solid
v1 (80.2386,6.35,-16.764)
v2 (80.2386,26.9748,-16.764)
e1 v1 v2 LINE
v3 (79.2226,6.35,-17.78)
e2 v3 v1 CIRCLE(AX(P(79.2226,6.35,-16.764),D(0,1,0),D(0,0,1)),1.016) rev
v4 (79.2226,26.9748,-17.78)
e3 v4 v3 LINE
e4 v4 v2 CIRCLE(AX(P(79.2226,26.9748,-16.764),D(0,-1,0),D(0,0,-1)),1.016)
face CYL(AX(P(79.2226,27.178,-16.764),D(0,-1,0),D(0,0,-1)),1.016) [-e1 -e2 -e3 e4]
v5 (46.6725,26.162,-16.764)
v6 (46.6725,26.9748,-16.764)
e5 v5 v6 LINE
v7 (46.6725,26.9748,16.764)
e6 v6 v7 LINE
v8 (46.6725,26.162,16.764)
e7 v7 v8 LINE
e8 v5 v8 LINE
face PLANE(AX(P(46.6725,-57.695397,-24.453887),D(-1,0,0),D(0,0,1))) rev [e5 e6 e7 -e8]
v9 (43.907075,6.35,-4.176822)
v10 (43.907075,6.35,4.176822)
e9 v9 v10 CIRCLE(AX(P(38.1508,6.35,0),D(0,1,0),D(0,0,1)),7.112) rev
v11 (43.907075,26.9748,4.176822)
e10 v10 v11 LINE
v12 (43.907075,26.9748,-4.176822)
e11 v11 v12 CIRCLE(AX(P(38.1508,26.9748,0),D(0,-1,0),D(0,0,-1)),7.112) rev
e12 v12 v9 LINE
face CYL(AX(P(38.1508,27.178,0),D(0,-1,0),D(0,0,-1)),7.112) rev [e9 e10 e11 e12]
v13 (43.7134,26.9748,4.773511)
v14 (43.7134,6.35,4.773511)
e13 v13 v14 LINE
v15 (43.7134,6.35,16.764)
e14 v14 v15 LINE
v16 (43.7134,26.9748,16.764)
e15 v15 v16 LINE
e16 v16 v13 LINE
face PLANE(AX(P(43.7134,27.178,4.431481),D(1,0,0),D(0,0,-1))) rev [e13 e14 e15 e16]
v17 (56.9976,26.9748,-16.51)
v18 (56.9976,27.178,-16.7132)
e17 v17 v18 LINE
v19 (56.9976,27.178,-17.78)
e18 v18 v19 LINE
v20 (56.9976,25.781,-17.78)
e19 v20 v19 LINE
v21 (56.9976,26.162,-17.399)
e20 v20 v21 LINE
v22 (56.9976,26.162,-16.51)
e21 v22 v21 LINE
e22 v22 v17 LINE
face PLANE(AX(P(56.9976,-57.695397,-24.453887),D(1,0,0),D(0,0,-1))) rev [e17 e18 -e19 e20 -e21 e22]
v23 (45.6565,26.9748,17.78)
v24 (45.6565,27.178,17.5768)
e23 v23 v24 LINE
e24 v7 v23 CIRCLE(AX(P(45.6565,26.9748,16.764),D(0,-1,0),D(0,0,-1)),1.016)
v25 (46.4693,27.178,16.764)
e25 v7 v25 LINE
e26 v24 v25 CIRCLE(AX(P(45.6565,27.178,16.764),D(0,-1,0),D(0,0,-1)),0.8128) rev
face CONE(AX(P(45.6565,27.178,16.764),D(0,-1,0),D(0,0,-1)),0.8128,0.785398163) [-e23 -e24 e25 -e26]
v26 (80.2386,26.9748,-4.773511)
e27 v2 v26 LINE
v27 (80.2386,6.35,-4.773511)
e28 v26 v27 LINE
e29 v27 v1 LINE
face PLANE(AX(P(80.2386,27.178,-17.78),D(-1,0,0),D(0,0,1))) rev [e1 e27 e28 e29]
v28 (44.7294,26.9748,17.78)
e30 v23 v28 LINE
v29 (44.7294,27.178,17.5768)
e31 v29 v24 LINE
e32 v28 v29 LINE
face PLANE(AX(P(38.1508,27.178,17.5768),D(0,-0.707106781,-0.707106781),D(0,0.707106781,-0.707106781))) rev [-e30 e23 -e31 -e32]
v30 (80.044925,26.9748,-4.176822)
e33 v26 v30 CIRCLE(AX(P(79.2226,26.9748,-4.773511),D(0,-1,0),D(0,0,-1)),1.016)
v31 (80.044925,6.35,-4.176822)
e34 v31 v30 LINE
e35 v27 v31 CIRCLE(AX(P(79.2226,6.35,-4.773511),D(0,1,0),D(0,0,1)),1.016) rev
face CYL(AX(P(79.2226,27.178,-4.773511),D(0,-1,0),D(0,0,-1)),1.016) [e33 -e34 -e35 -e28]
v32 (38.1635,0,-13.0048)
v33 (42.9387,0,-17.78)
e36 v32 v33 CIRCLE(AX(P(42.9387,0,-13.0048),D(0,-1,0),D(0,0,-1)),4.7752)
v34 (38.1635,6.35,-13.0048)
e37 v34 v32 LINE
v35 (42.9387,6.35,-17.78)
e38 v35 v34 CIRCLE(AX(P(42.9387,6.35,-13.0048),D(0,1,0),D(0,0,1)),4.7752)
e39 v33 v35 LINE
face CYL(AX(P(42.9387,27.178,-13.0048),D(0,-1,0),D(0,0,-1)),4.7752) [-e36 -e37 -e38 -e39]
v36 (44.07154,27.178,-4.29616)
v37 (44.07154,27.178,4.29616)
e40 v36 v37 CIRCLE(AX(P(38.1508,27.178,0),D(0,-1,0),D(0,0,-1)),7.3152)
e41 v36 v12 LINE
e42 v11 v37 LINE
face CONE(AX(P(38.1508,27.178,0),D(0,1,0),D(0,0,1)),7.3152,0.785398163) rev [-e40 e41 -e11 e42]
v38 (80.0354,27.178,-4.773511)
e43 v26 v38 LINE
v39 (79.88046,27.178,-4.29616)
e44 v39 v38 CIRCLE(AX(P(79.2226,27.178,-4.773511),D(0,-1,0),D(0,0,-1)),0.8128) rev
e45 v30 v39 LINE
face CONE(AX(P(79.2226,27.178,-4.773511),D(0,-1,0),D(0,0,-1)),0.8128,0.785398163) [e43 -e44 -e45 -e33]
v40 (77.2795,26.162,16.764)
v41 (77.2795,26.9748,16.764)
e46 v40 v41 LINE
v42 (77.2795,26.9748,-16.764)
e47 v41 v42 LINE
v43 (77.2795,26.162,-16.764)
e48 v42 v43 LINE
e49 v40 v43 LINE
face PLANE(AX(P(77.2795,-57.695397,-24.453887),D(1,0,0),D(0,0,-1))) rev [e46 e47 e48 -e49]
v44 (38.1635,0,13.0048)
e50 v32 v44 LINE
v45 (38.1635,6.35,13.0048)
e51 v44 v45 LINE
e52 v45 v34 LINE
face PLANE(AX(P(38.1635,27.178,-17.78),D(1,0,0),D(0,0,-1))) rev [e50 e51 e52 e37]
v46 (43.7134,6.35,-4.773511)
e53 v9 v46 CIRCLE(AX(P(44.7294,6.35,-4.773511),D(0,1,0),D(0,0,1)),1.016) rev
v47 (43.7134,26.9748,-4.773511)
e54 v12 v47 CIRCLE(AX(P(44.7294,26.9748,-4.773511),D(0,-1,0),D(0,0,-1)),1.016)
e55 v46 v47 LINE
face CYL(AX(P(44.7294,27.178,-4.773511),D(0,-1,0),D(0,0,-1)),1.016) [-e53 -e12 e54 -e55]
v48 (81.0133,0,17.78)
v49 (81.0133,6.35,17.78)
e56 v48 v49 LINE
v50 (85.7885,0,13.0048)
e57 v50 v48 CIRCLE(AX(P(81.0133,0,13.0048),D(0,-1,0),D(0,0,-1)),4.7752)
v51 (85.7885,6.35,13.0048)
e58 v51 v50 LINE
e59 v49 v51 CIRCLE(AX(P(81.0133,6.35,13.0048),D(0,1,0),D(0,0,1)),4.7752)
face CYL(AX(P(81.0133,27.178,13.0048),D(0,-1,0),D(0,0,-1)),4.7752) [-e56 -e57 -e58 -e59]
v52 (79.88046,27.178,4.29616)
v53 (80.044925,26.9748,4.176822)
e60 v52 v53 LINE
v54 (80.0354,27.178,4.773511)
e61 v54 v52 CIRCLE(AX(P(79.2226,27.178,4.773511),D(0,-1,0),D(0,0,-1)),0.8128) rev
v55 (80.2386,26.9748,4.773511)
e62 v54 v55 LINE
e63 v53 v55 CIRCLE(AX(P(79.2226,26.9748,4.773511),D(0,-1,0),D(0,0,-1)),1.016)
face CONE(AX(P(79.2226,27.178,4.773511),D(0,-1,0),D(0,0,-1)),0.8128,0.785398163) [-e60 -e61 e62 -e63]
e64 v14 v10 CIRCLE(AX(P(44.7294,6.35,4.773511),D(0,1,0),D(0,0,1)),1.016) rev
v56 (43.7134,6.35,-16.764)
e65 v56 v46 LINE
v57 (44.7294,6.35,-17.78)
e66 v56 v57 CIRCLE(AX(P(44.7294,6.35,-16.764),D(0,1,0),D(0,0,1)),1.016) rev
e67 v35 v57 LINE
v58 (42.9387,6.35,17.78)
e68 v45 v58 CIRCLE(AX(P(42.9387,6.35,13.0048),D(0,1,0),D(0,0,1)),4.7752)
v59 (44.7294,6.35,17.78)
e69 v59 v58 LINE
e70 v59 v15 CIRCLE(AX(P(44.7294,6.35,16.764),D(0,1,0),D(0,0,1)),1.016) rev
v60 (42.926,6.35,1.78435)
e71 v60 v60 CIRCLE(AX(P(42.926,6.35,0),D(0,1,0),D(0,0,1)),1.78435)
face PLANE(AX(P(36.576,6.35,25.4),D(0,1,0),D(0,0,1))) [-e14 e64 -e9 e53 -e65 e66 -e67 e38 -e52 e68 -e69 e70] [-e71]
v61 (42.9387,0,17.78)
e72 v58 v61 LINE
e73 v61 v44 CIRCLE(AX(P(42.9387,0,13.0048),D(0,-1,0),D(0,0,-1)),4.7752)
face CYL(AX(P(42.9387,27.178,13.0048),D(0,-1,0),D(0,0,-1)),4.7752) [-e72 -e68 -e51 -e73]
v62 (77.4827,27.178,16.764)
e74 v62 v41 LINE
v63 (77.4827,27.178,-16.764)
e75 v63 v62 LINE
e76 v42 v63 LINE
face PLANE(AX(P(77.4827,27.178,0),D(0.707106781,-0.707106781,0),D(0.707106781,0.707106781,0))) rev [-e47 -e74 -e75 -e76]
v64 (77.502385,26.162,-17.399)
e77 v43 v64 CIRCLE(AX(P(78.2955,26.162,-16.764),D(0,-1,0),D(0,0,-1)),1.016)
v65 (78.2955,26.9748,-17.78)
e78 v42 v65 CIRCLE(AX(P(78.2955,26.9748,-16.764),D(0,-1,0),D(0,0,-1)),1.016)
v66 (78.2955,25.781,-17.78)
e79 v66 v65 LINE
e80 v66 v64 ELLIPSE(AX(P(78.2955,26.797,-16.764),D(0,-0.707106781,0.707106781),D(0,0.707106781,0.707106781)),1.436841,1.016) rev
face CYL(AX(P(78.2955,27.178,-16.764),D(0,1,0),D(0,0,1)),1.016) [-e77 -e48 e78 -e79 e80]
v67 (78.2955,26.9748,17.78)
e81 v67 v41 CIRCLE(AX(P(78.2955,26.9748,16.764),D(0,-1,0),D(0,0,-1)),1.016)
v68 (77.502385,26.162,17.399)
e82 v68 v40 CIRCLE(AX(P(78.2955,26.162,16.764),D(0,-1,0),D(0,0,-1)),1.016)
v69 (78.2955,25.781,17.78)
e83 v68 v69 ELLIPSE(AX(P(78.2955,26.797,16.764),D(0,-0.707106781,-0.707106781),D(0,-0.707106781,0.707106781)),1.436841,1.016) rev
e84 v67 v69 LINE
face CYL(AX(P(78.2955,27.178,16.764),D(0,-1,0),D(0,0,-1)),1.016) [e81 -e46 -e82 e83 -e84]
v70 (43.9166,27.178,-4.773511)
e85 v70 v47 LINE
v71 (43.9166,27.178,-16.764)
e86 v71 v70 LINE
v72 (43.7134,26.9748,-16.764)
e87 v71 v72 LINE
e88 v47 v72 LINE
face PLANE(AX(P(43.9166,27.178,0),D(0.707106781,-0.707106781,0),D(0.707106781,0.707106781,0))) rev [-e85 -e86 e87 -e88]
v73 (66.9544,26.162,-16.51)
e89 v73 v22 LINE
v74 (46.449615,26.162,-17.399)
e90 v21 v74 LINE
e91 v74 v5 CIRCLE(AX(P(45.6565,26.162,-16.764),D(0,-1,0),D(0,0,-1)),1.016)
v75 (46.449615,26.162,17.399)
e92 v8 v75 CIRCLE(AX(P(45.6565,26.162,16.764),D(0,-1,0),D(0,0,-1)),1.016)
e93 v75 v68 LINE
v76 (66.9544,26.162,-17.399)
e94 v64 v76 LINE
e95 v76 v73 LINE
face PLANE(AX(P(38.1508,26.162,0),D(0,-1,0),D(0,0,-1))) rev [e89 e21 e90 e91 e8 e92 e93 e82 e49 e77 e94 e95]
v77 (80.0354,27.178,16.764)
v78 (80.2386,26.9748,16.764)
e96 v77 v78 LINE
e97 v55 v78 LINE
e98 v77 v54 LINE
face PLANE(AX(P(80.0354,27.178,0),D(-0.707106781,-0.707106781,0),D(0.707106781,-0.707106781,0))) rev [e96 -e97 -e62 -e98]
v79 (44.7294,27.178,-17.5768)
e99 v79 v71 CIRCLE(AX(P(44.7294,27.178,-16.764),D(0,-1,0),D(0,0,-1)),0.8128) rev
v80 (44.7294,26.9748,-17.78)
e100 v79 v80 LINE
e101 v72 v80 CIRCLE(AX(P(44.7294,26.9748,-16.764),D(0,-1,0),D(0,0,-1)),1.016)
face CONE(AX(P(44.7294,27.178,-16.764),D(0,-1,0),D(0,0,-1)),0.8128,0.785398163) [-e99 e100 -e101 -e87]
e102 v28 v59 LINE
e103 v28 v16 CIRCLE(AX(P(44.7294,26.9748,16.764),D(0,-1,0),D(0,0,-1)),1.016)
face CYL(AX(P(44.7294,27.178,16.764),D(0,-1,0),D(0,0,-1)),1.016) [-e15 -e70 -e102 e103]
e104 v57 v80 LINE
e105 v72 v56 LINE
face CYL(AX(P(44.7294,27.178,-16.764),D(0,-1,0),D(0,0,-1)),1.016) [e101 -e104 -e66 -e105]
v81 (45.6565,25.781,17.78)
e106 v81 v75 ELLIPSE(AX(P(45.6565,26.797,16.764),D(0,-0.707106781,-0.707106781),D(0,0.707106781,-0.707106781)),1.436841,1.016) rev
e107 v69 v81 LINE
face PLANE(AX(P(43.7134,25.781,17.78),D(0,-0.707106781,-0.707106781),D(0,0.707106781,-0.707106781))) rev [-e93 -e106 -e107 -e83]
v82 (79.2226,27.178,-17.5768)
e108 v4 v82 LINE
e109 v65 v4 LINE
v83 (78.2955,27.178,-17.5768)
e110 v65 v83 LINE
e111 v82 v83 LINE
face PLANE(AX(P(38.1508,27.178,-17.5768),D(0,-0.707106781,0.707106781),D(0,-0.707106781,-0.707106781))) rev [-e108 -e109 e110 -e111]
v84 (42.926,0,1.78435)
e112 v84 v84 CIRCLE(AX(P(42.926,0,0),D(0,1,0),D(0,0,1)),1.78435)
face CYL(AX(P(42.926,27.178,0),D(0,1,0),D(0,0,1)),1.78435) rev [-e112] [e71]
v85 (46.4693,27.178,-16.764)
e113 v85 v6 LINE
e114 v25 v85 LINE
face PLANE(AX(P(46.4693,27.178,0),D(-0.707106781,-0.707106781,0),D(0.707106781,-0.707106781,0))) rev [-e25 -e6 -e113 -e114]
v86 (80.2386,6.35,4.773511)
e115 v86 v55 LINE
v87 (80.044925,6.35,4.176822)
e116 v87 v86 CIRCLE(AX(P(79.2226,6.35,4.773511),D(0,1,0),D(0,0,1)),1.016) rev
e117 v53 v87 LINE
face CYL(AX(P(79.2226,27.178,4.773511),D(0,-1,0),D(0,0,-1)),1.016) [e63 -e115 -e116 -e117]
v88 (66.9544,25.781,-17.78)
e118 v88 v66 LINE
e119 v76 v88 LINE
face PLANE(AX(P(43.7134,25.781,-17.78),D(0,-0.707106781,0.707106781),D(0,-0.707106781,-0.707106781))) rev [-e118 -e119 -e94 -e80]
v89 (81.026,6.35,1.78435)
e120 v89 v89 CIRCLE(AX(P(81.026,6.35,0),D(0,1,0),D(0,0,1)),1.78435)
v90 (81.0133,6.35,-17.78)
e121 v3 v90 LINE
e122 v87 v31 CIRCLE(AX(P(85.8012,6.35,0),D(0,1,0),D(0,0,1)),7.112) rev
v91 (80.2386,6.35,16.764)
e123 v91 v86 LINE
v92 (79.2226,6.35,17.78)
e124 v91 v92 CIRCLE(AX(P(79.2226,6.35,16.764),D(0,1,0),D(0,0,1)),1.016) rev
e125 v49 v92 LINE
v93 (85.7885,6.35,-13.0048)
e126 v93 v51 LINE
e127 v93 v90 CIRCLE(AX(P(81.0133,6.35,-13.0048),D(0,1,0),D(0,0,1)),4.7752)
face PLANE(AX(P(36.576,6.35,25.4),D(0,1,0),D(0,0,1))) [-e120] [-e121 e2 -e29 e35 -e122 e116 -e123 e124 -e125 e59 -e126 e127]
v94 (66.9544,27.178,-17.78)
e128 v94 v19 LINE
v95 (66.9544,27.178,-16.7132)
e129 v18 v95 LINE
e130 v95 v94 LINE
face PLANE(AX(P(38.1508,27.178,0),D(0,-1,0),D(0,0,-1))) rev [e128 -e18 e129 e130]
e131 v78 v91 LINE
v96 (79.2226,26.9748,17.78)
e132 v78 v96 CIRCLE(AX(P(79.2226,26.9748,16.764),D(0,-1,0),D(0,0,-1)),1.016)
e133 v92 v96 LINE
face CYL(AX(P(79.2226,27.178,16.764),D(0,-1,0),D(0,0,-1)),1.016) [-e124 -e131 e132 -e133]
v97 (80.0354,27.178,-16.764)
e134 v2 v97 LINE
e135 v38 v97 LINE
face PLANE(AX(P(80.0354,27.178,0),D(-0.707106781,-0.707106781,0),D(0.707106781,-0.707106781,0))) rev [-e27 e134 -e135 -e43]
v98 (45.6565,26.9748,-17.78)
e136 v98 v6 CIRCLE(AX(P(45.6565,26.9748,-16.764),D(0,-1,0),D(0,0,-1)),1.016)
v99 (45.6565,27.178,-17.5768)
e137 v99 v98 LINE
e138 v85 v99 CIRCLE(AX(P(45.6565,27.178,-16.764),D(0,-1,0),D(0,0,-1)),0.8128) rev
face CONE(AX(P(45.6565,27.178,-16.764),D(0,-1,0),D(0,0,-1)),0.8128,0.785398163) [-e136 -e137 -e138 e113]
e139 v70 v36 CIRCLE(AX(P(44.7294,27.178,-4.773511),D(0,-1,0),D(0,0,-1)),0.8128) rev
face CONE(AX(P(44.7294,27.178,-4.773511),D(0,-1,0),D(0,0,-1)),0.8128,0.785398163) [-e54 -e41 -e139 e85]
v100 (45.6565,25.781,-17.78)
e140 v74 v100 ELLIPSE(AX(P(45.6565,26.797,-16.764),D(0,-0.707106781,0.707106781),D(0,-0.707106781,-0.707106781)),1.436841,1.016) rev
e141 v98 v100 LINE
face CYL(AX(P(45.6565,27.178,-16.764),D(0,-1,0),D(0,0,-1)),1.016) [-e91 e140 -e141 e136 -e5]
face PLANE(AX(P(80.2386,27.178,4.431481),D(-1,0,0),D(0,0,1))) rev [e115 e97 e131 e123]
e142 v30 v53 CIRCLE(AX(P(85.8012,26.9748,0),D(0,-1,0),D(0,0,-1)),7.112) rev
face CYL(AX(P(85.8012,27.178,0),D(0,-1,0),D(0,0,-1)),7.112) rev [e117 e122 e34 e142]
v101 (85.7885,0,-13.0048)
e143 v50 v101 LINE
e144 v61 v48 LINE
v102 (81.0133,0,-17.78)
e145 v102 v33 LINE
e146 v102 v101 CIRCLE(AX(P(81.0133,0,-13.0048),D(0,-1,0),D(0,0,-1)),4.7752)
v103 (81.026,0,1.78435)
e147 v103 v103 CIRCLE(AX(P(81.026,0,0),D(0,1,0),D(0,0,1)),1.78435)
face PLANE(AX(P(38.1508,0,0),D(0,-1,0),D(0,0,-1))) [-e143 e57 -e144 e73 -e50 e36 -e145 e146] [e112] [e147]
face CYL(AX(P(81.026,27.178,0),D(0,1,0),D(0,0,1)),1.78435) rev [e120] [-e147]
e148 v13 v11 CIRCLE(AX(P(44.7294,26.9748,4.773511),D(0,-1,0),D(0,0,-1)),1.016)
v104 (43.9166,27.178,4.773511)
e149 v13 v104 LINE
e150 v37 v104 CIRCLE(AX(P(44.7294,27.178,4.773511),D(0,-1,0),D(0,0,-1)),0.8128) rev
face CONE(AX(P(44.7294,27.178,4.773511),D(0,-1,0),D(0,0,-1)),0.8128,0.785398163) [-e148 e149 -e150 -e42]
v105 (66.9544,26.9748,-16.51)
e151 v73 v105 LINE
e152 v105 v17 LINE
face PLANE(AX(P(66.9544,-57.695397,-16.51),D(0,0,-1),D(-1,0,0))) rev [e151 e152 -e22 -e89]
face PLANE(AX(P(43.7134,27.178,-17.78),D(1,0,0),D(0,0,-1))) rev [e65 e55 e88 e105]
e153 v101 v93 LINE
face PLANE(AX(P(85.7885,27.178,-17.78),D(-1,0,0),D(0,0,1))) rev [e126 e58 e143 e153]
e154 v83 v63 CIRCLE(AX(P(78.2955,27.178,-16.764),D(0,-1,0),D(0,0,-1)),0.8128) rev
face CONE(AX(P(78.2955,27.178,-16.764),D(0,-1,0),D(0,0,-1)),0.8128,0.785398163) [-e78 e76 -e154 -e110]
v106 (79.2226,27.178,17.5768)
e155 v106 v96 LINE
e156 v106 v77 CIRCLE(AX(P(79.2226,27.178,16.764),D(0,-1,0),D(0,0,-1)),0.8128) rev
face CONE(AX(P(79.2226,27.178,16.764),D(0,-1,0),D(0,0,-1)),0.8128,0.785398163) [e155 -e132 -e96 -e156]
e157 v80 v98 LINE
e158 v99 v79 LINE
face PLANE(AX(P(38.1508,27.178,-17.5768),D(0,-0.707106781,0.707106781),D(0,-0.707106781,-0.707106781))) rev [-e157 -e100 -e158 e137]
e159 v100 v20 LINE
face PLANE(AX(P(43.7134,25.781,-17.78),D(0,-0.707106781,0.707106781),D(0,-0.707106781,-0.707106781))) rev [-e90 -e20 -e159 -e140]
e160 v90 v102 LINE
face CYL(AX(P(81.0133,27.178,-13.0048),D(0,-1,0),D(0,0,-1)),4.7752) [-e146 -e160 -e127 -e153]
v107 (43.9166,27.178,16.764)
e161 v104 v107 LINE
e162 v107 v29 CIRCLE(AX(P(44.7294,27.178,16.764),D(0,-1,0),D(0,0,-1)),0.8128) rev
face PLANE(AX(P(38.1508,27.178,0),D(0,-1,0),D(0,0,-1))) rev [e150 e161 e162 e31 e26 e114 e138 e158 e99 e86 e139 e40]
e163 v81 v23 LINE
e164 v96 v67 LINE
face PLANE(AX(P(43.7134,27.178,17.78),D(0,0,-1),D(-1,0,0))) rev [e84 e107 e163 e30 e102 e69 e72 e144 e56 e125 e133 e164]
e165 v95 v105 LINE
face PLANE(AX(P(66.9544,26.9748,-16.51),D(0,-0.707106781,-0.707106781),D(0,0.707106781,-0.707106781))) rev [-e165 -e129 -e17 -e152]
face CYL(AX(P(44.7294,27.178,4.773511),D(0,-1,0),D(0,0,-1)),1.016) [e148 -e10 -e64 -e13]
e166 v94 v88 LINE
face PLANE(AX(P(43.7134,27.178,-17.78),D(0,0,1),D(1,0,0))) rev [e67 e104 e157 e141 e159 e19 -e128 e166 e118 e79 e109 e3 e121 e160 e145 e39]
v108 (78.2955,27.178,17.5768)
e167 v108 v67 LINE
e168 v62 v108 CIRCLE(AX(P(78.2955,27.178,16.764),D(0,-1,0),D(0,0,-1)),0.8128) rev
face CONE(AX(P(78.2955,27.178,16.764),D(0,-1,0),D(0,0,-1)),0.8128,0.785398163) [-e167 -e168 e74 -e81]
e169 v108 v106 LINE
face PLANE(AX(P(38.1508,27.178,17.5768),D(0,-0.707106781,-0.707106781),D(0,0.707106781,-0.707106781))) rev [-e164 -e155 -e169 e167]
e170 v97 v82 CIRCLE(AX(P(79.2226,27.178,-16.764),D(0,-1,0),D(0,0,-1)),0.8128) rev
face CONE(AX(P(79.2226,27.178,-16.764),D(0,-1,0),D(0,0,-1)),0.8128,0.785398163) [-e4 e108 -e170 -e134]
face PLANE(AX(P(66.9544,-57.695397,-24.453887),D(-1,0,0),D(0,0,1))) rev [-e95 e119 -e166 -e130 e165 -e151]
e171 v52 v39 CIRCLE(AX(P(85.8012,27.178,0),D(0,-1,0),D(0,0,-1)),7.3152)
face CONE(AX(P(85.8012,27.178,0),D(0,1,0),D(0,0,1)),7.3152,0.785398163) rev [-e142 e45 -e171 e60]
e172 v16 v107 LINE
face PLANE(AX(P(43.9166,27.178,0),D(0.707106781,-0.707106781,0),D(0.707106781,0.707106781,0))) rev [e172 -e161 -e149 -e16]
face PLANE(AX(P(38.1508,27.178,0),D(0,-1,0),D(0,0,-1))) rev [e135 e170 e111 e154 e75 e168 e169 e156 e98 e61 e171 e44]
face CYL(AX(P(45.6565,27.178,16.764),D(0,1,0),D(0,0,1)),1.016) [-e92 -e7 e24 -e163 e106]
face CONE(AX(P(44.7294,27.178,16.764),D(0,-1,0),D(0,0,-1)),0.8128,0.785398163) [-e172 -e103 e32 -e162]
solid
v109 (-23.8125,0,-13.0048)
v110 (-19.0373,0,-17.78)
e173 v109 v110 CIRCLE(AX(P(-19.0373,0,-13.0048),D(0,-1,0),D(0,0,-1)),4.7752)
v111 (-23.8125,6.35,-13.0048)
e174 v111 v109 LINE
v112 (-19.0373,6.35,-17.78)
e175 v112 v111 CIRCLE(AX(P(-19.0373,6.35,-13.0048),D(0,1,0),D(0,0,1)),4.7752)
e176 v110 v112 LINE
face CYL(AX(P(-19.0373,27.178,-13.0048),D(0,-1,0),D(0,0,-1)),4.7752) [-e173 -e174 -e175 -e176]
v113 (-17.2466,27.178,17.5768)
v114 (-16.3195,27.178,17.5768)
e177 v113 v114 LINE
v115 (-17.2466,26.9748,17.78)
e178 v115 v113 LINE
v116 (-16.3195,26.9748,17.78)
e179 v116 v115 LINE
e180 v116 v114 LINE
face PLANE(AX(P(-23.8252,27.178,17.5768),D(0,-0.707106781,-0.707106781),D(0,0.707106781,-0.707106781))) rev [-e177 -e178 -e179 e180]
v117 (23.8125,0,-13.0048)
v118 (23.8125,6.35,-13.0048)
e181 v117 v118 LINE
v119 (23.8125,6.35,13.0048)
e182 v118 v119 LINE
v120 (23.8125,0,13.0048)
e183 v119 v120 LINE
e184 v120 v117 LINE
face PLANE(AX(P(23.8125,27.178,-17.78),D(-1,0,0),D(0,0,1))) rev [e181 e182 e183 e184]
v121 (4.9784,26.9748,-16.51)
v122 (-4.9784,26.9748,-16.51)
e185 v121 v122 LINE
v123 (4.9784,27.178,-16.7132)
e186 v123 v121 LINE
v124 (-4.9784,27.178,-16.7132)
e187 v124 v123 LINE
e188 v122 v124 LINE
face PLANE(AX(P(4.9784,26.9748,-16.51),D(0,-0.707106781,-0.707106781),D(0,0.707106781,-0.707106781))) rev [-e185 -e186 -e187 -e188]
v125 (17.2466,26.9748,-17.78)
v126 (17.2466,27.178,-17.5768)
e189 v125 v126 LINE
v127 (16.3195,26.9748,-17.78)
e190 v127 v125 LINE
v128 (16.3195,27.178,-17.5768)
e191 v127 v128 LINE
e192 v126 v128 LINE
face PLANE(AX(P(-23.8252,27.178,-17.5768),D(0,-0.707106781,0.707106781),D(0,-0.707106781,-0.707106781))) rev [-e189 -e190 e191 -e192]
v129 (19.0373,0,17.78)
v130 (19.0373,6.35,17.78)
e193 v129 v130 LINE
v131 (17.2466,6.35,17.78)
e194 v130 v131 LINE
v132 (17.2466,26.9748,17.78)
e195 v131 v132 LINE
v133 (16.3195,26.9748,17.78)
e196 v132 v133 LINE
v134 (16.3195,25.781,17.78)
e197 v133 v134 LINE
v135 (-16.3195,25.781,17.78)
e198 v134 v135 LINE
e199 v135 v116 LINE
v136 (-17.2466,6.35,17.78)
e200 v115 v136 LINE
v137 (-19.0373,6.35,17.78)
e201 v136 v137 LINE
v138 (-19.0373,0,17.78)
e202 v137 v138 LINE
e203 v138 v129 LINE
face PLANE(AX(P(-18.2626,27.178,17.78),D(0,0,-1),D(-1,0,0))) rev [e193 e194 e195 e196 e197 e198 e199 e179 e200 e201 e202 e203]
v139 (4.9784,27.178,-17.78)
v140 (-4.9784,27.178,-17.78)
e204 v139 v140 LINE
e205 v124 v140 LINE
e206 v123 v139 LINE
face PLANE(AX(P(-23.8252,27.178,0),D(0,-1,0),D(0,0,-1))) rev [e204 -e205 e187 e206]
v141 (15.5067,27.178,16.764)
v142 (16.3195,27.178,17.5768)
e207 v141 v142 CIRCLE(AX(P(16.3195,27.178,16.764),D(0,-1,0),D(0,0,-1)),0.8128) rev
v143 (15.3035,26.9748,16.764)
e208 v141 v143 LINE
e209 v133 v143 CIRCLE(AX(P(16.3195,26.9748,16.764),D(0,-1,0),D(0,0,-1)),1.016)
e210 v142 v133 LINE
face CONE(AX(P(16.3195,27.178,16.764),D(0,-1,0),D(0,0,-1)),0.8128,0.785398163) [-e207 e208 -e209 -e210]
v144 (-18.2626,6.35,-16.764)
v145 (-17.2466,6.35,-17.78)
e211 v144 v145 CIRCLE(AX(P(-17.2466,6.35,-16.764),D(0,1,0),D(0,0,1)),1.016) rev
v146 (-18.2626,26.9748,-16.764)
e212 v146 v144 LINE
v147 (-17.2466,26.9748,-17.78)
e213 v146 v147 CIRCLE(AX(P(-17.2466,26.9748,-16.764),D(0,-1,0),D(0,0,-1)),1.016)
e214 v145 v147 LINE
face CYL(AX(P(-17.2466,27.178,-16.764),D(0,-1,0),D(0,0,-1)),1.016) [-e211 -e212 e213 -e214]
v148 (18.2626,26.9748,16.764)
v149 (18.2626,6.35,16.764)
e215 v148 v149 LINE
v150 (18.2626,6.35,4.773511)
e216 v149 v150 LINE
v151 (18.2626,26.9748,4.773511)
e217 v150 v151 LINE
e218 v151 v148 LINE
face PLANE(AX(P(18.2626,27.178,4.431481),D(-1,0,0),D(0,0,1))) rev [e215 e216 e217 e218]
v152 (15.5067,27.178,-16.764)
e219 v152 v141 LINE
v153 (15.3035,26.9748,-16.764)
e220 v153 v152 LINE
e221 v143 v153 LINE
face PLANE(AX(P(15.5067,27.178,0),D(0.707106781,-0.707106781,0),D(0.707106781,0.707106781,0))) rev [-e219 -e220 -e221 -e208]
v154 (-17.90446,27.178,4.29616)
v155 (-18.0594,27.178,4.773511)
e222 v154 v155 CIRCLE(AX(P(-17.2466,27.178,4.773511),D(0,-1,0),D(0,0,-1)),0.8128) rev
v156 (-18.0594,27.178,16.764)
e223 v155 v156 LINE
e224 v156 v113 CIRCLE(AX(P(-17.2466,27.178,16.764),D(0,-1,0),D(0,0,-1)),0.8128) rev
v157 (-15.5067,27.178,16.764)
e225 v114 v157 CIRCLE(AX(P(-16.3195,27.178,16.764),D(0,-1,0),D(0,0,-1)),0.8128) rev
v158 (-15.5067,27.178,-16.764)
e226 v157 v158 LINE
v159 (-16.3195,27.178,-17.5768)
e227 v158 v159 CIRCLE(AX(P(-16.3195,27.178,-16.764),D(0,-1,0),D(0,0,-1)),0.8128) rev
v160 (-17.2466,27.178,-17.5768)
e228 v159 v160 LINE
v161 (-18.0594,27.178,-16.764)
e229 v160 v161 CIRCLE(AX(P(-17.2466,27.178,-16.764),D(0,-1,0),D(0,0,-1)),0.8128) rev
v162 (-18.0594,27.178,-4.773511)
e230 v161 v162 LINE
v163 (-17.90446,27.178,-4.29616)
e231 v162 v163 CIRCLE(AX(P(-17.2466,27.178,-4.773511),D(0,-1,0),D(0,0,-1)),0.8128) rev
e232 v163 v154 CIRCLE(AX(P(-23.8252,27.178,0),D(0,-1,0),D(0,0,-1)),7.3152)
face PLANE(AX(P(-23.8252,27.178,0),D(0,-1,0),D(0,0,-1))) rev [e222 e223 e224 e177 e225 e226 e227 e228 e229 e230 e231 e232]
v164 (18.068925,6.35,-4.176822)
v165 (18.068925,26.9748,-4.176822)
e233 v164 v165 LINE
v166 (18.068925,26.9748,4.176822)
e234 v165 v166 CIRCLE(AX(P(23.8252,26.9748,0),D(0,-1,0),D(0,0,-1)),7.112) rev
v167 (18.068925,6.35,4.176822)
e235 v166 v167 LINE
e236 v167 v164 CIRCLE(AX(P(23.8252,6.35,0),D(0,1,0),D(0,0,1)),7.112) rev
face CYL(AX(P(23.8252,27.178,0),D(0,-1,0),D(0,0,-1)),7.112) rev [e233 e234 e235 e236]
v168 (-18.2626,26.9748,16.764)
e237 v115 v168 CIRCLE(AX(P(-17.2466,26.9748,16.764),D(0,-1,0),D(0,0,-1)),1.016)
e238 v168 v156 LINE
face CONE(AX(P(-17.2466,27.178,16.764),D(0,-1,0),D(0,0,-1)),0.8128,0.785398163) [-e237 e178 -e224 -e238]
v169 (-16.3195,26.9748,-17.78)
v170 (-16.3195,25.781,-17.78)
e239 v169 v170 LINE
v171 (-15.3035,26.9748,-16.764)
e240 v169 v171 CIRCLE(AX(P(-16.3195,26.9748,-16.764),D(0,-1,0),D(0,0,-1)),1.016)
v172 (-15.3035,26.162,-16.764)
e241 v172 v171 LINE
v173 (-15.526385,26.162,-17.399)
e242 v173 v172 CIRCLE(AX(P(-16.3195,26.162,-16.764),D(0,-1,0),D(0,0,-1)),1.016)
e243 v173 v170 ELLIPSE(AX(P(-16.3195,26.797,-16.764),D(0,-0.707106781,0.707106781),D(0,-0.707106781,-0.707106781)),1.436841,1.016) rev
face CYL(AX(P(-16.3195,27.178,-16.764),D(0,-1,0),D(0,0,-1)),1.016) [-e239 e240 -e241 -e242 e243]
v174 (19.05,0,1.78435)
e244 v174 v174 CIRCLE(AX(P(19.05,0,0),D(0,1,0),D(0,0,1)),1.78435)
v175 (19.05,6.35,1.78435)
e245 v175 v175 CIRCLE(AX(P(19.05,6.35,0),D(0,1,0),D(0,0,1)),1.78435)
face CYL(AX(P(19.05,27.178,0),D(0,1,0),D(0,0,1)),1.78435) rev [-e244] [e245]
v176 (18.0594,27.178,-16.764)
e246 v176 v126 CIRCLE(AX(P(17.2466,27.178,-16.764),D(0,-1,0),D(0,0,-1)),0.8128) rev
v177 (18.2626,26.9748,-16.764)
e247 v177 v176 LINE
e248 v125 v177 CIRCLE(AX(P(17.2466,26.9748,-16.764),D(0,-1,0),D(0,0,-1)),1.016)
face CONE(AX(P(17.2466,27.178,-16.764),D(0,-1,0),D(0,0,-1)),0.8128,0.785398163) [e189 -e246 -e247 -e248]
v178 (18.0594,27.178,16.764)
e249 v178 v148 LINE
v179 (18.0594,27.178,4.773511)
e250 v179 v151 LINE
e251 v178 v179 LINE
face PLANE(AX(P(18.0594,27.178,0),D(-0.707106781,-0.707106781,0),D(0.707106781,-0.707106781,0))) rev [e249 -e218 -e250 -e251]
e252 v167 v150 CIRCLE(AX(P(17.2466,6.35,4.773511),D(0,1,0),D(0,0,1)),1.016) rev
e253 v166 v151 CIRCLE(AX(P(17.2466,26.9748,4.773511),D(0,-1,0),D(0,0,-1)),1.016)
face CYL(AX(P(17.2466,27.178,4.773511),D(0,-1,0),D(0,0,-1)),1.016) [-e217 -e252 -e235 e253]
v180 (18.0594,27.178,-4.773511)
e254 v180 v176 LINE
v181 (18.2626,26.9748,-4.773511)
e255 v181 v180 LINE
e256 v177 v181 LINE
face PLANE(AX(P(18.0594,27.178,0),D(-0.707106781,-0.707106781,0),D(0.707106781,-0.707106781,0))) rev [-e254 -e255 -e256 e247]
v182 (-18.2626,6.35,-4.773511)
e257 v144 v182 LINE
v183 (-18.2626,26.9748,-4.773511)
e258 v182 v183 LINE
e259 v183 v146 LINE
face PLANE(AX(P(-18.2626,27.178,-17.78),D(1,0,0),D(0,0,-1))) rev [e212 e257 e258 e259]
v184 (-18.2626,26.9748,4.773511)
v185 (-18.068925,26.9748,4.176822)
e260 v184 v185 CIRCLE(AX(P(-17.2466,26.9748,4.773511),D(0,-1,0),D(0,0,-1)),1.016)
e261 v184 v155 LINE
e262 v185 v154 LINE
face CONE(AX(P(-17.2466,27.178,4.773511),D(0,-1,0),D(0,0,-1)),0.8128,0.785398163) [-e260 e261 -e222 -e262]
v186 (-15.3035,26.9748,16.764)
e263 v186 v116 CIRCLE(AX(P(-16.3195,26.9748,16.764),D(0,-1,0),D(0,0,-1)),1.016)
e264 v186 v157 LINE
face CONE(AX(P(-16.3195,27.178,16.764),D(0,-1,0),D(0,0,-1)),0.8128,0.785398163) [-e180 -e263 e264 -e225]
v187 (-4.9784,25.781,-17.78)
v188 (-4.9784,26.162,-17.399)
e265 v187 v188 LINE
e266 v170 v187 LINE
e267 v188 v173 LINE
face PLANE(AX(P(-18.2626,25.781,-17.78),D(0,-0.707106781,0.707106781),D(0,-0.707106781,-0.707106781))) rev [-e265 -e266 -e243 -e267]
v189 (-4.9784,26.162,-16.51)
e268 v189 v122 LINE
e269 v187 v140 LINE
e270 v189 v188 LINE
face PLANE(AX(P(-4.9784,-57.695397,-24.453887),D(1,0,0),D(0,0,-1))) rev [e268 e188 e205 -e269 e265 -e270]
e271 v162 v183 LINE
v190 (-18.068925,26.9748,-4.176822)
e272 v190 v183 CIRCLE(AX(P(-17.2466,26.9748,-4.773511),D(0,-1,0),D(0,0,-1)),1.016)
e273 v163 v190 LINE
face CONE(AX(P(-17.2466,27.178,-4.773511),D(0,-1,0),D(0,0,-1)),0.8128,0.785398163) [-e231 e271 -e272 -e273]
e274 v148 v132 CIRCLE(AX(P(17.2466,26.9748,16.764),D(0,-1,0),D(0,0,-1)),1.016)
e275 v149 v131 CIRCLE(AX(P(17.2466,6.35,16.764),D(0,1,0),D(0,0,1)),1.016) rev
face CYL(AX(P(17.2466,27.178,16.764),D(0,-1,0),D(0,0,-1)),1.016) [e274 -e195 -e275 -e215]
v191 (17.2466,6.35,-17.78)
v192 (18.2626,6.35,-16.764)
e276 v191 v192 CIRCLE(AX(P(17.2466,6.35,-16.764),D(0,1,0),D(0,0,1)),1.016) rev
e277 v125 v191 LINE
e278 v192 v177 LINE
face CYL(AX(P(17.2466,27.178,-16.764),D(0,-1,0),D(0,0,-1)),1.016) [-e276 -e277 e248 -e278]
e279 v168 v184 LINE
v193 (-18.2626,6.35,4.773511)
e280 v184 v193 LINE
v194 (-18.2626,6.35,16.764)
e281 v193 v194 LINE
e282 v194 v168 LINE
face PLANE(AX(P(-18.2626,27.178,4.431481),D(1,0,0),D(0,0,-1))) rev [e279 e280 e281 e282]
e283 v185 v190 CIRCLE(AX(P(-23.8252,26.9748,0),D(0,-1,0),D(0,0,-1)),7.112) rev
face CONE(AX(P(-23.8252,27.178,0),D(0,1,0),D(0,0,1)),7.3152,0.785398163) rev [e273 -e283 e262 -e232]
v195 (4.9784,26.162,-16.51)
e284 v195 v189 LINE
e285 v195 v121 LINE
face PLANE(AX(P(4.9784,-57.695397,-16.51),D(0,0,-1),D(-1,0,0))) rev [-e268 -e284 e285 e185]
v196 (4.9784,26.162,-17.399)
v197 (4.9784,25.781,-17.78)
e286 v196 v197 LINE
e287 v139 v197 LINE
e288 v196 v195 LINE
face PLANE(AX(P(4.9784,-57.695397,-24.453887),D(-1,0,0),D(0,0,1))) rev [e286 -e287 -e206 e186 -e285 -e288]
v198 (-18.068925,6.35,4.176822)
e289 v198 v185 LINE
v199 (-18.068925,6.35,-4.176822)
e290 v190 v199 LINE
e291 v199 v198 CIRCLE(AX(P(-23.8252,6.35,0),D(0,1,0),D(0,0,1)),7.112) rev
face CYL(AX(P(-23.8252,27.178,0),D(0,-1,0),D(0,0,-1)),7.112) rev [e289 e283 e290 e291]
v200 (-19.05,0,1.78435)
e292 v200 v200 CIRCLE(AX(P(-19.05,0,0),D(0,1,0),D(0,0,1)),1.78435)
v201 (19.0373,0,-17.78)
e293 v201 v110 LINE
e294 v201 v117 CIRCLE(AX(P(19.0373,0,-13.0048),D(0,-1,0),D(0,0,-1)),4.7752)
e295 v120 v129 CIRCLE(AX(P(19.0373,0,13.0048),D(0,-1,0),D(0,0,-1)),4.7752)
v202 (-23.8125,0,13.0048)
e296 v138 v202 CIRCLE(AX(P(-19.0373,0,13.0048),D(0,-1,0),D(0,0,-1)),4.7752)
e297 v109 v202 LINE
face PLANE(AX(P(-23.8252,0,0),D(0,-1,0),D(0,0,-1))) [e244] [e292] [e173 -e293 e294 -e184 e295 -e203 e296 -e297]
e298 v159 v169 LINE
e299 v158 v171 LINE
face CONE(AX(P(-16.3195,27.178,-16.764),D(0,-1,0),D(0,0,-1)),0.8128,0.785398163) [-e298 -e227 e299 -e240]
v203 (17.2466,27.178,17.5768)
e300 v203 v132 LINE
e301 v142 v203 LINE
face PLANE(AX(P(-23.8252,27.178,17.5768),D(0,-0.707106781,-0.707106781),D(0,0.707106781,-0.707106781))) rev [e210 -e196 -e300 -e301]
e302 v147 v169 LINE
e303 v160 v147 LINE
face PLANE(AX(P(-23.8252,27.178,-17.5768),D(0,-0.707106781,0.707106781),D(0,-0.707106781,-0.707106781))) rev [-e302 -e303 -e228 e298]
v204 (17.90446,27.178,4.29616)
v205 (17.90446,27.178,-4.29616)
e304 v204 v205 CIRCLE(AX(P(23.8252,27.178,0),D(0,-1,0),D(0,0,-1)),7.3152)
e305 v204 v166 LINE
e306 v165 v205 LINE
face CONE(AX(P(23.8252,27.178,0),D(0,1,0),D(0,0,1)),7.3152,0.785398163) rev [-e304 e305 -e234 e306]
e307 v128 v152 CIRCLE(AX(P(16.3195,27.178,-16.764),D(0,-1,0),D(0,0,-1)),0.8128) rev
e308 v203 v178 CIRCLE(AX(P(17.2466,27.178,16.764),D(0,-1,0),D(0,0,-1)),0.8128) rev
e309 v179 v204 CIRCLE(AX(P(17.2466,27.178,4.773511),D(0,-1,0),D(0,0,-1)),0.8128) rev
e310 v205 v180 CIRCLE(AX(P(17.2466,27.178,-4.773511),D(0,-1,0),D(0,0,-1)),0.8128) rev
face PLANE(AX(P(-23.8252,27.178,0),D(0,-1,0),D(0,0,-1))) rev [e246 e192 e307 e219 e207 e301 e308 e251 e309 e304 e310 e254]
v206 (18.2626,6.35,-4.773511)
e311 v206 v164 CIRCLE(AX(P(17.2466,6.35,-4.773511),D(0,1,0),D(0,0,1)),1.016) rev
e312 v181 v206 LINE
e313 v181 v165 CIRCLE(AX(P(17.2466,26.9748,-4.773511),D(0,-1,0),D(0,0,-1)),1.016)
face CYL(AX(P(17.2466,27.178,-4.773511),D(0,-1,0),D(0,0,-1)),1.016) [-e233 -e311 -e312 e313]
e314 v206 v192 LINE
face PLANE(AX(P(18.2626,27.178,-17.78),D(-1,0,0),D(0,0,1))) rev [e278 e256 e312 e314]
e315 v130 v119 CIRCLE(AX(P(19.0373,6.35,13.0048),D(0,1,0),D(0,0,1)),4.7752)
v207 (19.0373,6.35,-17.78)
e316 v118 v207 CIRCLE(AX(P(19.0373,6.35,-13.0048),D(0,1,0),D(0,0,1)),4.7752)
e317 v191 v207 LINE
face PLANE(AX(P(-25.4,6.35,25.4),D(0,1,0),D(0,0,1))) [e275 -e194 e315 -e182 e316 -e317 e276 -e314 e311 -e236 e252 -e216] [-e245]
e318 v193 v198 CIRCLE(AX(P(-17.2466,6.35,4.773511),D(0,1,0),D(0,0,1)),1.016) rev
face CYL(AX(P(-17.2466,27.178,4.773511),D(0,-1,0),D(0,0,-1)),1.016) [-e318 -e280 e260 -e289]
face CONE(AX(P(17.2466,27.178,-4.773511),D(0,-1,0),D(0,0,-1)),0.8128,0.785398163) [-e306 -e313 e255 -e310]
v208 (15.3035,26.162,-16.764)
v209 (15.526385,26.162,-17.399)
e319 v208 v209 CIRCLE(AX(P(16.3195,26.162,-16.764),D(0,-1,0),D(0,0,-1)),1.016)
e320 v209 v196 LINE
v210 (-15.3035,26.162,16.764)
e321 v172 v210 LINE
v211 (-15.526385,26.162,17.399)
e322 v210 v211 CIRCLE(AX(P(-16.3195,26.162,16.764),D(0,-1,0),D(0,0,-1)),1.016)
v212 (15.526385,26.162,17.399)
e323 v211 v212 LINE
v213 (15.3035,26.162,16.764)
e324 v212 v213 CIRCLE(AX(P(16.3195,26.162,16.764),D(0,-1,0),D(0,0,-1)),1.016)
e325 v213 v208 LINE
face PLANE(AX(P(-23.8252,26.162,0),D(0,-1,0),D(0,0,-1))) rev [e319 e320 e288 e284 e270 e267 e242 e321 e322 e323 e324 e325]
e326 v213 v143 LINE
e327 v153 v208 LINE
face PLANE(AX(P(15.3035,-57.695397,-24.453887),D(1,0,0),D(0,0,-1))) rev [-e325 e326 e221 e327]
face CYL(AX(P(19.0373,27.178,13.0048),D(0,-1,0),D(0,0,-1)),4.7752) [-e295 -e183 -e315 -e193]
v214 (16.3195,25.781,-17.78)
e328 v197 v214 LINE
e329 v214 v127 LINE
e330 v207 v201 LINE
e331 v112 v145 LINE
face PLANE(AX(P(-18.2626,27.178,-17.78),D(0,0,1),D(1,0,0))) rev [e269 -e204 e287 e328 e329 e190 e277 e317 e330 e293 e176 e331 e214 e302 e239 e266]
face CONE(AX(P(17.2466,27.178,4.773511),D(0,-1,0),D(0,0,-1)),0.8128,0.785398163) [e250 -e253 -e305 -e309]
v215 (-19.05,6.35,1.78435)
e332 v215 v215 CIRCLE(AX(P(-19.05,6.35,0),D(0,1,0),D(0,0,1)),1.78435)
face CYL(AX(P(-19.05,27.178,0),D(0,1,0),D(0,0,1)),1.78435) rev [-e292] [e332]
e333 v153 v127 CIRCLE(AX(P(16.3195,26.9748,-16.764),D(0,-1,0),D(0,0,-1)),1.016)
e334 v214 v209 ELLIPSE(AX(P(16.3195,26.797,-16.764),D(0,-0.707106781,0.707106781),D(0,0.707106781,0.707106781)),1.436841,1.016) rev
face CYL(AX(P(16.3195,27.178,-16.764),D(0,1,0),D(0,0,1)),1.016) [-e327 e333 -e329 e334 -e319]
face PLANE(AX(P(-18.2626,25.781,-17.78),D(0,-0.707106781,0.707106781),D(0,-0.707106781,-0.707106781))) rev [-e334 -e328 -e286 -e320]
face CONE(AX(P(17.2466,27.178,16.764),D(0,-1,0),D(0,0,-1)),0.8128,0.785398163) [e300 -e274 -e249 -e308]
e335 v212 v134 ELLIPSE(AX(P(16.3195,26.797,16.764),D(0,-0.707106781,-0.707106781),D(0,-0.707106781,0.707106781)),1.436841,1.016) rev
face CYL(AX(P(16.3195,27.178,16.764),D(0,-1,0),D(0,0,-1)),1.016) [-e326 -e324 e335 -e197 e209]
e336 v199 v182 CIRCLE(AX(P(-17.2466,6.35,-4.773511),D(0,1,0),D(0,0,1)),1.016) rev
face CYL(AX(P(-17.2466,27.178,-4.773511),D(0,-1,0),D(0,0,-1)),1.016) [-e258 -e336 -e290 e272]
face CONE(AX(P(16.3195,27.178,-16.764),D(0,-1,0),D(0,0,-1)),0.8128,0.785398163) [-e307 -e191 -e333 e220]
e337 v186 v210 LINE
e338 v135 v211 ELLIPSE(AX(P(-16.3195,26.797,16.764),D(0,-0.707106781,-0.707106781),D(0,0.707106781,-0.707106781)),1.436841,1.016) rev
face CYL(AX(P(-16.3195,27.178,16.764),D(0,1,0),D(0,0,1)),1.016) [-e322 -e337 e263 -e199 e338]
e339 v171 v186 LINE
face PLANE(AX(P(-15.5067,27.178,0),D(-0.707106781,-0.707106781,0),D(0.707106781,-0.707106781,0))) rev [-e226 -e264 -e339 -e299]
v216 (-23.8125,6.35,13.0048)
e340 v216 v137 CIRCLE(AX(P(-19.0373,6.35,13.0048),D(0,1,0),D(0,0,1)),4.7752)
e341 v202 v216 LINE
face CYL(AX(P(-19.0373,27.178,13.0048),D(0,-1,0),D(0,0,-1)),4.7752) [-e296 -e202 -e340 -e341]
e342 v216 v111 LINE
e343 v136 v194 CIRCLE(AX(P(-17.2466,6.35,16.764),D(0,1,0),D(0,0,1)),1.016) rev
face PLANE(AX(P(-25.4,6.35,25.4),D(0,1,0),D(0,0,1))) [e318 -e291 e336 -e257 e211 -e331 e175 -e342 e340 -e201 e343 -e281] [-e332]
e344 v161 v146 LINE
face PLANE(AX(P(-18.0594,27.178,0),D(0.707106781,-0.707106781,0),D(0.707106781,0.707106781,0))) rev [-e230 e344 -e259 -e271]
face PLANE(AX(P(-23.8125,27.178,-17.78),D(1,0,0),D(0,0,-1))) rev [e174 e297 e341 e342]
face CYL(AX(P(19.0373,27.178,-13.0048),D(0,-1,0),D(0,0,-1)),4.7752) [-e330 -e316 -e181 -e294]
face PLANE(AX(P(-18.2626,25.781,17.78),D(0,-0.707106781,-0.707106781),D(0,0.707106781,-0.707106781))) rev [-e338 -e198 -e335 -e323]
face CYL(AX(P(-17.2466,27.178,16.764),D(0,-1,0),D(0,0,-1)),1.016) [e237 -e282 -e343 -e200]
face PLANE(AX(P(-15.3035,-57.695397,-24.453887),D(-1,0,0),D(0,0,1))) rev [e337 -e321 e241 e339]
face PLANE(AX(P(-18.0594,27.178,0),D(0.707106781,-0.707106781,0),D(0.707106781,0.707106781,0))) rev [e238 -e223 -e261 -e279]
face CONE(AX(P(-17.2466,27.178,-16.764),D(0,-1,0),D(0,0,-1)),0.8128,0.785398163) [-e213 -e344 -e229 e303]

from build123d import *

# Parameters (mm, degrees)
EXTRUDE1_DEPTH                       = 27.178
SKETCH8_W                            = 50.8
SKETCH8_H                            = 50.8
EXTRUDE2_DEPTH                       = 6.35
CUT_EXTRUDE1_DEPTH                   = 1.016
FILLET3_R                            = 1.016
SKETCH9_OUTSIDE_W                    = 68.162
SKETCH9_OUTSIDE_H                    = 68.162
SKETCH9_OUTSIDE_W_2                  = 47.625
SKETCH9_OUTSIDE_H_2                  = 35.56
CUT_EXTRUDE3_DEPTH                   = 46.044019403
F_28_0_1405_DIAMETER_HOLE1_OUTLINE_R = 1.78435
F_28_0_1405_DIAMETER_HOLE1_DEPTH     = 6.35
FILLET5_R                            = 4.7752
FILLET2_R                            = 1.016
CHAMFER4_SIZE                        = 0.2032
CHAMFER5_SIZE                        = 0.381


# Read off the part's stored shape, not the designer's step: #28 (0.1405) Diameter Hole1
with BuildPart() as part:
    # Sketch1 → Extrude1 (new body)
    with BuildSketch(Plane(origin=(0, 0, 0), x_dir=(1, 0, 0), z_dir=(0, 1, 0))):
        with BuildLine():
            Line((-18.2626, 17.78), (18.2626, 17.78))
            Line((18.2626, 17.78), (18.2626, 4.431481156))
            ThreePointArc((18.2626, 4.431481156), (16.7132, 0), (18.2626, -4.431481156))
            Line((18.2626, -4.431481156), (18.2626, -17.78))
            Line((18.2626, -17.78), (-18.2626, -17.78))
            Line((-18.2626, -17.78), (-18.2626, -4.431481156))
            ThreePointArc((-18.2626, -4.431481156), (-16.7132, 0), (-18.2626, 4.431481156))
            Line((-18.2626, 4.431481156), (-18.2626, 17.78))
        make_face()
    extrude(amount=EXTRUDE1_DEPTH)

    # Sketch8 → Extrude2 (add)
    with BuildSketch(Plane(origin=(0, 0, 0), x_dir=(1, 0, 0), z_dir=(0, 1, 0))):
        Rectangle(SKETCH8_W, SKETCH8_H)
    extrude(amount=EXTRUDE2_DEPTH)

    # Sketch6 → Cut-Extrude1 (cut)
    with BuildSketch(Plane(origin=(0, 27.178, 0), x_dir=(-1, 0, 0), z_dir=(0, 1, 0))):
        Polygon((-15.3035, 24.453887049), (15.3035, 24.453887049), (15.3035, -24.453887049), (4.9784, -24.453887049), (4.9784, -16.51), (-4.9784, -16.51), (-4.9784, -24.453887049), (-15.3035, -24.453887049), align=None)
    extrude(amount=-CUT_EXTRUDE1_DEPTH, mode=Mode.SUBTRACT)

    # Fillet3
    fillet3_edges = [part.edges().sort_by_distance(p)[0] for p in [
        (-18.2626, 16.764, -17.78),
        (18.2626, 16.764, -17.78),
        (18.2626, 16.764, -4.431481156),
        (18.2626, 16.764, 4.431481156),
        (18.2626, 16.764, 17.78),
        (-18.2626, 16.764, 17.78),
        (-18.2626, 16.764, 4.431481156),
        (-18.2626, 16.764, -4.431481156),
    ]]
    fillet(fillet3_edges, radius=FILLET3_R)

    # Sketch9 outside → Cut-Extrude3 (cut, through all)
    with BuildSketch(Plane(origin=(0, 0, 0), x_dir=(1, 0, 0), z_dir=(0, 1, 0))):
        Rectangle(SKETCH9_OUTSIDE_W, SKETCH9_OUTSIDE_H)
        Rectangle(SKETCH9_OUTSIDE_W_2, SKETCH9_OUTSIDE_H_2, mode=Mode.SUBTRACT)
    extrude(amount=CUT_EXTRUDE3_DEPTH, mode=Mode.SUBTRACT)

    # #28 (0.1405) Diameter Hole1 outline → #28 (0.1405) Diameter Hole1 (cut)
    with BuildSketch(Plane(origin=(0, 0, 0), x_dir=(1, 0, 0), z_dir=(0, 1, 0))):
        with Locations((19.05, 0)):
            Circle(F_28_0_1405_DIAMETER_HOLE1_OUTLINE_R)
        with Locations((-19.05, 0)):
            Circle(F_28_0_1405_DIAMETER_HOLE1_OUTLINE_R)
    extrude(amount=F_28_0_1405_DIAMETER_HOLE1_DEPTH, mode=Mode.SUBTRACT)

    # Fillet5
    fillet5_edges = [part.edges().sort_by_distance(p)[0] for p in [
        (-23.8125, 3.175, 17.78),
        (23.8125, 3.175, 17.78),
        (23.8125, 3.175, -17.78),
        (-23.8125, 3.175, -17.78),
    ]]
    fillet(fillet5_edges, radius=FILLET5_R)

    # Fillet2
    fillet2_edges = [part.edges().sort_by_distance(p)[0] for p in [
        (-15.3035, 26.67, 17.78),
        (-15.3035, 26.67, -17.78),
        (15.3035, 26.67, 17.78),
        (15.3035, 26.67, -17.78),
    ]]
    fillet(fillet2_edges, radius=FILLET2_R)

    # Chamfer4
    chamfer4_edges = [part.edges().sort_by_distance(p)[0] for p in [
        (16.78305, 27.178, -17.78),
        (18.2626, 27.178, -10.768755436),
        (17.96502049, 27.178, 17.48242049),
        (17.96502049, 27.178, -17.48242049),
        (18.212969029, 27.178, -4.45984401),
        (18.212969029, 27.178, 4.45984401),
        (16.78305, 27.178, 17.78),
        (-15.3035, 27.178, 0),
        (-16.78305, 27.178, -17.78),
        (-15.60107951, 27.178, -17.48242049),
        (-15.60107951, 27.178, 17.48242049),
        (15.3035, 27.178, 0),
        (15.60107951, 27.178, 17.48242049),
        (15.60107951, 27.178, -17.48242049),
        (0, 27.178, -16.51),
        (-18.2626, 27.178, 10.768755436),
        (-16.7132, 27.178, 0),
        (-16.78305, 27.178, 17.78),
        (-18.2626, 27.178, -10.768755436),
        (-17.96502049, 27.178, 17.48242049),
        (-17.96502049, 27.178, -17.48242049),
        (-18.212969029, 27.178, -4.45984401),
        (-18.212969029, 27.178, 4.45984401),
        (16.7132, 27.178, 0),
        (18.2626, 27.178, 10.768755436),
    ]]
    chamfer(chamfer4_edges, length=CHAMFER4_SIZE)

    # Chamfer5
    chamfer5_edges = [part.edges().sort_by_distance(p)[0] for p in [
        (10.64895, 26.162, -17.78),
        (-10.64895, 26.162, -17.78),
        (0, 26.162, 17.78),
    ]]
    chamfer(chamfer5_edges, length=CHAMFER5_SIZE)


with BuildPart() as body_2:
    # Body-Move/Copy1: copy of part
    add(part.part.moved(Location((61.976, -5e-08, 0))))


solid = Compound([part.part, body_2.part])
